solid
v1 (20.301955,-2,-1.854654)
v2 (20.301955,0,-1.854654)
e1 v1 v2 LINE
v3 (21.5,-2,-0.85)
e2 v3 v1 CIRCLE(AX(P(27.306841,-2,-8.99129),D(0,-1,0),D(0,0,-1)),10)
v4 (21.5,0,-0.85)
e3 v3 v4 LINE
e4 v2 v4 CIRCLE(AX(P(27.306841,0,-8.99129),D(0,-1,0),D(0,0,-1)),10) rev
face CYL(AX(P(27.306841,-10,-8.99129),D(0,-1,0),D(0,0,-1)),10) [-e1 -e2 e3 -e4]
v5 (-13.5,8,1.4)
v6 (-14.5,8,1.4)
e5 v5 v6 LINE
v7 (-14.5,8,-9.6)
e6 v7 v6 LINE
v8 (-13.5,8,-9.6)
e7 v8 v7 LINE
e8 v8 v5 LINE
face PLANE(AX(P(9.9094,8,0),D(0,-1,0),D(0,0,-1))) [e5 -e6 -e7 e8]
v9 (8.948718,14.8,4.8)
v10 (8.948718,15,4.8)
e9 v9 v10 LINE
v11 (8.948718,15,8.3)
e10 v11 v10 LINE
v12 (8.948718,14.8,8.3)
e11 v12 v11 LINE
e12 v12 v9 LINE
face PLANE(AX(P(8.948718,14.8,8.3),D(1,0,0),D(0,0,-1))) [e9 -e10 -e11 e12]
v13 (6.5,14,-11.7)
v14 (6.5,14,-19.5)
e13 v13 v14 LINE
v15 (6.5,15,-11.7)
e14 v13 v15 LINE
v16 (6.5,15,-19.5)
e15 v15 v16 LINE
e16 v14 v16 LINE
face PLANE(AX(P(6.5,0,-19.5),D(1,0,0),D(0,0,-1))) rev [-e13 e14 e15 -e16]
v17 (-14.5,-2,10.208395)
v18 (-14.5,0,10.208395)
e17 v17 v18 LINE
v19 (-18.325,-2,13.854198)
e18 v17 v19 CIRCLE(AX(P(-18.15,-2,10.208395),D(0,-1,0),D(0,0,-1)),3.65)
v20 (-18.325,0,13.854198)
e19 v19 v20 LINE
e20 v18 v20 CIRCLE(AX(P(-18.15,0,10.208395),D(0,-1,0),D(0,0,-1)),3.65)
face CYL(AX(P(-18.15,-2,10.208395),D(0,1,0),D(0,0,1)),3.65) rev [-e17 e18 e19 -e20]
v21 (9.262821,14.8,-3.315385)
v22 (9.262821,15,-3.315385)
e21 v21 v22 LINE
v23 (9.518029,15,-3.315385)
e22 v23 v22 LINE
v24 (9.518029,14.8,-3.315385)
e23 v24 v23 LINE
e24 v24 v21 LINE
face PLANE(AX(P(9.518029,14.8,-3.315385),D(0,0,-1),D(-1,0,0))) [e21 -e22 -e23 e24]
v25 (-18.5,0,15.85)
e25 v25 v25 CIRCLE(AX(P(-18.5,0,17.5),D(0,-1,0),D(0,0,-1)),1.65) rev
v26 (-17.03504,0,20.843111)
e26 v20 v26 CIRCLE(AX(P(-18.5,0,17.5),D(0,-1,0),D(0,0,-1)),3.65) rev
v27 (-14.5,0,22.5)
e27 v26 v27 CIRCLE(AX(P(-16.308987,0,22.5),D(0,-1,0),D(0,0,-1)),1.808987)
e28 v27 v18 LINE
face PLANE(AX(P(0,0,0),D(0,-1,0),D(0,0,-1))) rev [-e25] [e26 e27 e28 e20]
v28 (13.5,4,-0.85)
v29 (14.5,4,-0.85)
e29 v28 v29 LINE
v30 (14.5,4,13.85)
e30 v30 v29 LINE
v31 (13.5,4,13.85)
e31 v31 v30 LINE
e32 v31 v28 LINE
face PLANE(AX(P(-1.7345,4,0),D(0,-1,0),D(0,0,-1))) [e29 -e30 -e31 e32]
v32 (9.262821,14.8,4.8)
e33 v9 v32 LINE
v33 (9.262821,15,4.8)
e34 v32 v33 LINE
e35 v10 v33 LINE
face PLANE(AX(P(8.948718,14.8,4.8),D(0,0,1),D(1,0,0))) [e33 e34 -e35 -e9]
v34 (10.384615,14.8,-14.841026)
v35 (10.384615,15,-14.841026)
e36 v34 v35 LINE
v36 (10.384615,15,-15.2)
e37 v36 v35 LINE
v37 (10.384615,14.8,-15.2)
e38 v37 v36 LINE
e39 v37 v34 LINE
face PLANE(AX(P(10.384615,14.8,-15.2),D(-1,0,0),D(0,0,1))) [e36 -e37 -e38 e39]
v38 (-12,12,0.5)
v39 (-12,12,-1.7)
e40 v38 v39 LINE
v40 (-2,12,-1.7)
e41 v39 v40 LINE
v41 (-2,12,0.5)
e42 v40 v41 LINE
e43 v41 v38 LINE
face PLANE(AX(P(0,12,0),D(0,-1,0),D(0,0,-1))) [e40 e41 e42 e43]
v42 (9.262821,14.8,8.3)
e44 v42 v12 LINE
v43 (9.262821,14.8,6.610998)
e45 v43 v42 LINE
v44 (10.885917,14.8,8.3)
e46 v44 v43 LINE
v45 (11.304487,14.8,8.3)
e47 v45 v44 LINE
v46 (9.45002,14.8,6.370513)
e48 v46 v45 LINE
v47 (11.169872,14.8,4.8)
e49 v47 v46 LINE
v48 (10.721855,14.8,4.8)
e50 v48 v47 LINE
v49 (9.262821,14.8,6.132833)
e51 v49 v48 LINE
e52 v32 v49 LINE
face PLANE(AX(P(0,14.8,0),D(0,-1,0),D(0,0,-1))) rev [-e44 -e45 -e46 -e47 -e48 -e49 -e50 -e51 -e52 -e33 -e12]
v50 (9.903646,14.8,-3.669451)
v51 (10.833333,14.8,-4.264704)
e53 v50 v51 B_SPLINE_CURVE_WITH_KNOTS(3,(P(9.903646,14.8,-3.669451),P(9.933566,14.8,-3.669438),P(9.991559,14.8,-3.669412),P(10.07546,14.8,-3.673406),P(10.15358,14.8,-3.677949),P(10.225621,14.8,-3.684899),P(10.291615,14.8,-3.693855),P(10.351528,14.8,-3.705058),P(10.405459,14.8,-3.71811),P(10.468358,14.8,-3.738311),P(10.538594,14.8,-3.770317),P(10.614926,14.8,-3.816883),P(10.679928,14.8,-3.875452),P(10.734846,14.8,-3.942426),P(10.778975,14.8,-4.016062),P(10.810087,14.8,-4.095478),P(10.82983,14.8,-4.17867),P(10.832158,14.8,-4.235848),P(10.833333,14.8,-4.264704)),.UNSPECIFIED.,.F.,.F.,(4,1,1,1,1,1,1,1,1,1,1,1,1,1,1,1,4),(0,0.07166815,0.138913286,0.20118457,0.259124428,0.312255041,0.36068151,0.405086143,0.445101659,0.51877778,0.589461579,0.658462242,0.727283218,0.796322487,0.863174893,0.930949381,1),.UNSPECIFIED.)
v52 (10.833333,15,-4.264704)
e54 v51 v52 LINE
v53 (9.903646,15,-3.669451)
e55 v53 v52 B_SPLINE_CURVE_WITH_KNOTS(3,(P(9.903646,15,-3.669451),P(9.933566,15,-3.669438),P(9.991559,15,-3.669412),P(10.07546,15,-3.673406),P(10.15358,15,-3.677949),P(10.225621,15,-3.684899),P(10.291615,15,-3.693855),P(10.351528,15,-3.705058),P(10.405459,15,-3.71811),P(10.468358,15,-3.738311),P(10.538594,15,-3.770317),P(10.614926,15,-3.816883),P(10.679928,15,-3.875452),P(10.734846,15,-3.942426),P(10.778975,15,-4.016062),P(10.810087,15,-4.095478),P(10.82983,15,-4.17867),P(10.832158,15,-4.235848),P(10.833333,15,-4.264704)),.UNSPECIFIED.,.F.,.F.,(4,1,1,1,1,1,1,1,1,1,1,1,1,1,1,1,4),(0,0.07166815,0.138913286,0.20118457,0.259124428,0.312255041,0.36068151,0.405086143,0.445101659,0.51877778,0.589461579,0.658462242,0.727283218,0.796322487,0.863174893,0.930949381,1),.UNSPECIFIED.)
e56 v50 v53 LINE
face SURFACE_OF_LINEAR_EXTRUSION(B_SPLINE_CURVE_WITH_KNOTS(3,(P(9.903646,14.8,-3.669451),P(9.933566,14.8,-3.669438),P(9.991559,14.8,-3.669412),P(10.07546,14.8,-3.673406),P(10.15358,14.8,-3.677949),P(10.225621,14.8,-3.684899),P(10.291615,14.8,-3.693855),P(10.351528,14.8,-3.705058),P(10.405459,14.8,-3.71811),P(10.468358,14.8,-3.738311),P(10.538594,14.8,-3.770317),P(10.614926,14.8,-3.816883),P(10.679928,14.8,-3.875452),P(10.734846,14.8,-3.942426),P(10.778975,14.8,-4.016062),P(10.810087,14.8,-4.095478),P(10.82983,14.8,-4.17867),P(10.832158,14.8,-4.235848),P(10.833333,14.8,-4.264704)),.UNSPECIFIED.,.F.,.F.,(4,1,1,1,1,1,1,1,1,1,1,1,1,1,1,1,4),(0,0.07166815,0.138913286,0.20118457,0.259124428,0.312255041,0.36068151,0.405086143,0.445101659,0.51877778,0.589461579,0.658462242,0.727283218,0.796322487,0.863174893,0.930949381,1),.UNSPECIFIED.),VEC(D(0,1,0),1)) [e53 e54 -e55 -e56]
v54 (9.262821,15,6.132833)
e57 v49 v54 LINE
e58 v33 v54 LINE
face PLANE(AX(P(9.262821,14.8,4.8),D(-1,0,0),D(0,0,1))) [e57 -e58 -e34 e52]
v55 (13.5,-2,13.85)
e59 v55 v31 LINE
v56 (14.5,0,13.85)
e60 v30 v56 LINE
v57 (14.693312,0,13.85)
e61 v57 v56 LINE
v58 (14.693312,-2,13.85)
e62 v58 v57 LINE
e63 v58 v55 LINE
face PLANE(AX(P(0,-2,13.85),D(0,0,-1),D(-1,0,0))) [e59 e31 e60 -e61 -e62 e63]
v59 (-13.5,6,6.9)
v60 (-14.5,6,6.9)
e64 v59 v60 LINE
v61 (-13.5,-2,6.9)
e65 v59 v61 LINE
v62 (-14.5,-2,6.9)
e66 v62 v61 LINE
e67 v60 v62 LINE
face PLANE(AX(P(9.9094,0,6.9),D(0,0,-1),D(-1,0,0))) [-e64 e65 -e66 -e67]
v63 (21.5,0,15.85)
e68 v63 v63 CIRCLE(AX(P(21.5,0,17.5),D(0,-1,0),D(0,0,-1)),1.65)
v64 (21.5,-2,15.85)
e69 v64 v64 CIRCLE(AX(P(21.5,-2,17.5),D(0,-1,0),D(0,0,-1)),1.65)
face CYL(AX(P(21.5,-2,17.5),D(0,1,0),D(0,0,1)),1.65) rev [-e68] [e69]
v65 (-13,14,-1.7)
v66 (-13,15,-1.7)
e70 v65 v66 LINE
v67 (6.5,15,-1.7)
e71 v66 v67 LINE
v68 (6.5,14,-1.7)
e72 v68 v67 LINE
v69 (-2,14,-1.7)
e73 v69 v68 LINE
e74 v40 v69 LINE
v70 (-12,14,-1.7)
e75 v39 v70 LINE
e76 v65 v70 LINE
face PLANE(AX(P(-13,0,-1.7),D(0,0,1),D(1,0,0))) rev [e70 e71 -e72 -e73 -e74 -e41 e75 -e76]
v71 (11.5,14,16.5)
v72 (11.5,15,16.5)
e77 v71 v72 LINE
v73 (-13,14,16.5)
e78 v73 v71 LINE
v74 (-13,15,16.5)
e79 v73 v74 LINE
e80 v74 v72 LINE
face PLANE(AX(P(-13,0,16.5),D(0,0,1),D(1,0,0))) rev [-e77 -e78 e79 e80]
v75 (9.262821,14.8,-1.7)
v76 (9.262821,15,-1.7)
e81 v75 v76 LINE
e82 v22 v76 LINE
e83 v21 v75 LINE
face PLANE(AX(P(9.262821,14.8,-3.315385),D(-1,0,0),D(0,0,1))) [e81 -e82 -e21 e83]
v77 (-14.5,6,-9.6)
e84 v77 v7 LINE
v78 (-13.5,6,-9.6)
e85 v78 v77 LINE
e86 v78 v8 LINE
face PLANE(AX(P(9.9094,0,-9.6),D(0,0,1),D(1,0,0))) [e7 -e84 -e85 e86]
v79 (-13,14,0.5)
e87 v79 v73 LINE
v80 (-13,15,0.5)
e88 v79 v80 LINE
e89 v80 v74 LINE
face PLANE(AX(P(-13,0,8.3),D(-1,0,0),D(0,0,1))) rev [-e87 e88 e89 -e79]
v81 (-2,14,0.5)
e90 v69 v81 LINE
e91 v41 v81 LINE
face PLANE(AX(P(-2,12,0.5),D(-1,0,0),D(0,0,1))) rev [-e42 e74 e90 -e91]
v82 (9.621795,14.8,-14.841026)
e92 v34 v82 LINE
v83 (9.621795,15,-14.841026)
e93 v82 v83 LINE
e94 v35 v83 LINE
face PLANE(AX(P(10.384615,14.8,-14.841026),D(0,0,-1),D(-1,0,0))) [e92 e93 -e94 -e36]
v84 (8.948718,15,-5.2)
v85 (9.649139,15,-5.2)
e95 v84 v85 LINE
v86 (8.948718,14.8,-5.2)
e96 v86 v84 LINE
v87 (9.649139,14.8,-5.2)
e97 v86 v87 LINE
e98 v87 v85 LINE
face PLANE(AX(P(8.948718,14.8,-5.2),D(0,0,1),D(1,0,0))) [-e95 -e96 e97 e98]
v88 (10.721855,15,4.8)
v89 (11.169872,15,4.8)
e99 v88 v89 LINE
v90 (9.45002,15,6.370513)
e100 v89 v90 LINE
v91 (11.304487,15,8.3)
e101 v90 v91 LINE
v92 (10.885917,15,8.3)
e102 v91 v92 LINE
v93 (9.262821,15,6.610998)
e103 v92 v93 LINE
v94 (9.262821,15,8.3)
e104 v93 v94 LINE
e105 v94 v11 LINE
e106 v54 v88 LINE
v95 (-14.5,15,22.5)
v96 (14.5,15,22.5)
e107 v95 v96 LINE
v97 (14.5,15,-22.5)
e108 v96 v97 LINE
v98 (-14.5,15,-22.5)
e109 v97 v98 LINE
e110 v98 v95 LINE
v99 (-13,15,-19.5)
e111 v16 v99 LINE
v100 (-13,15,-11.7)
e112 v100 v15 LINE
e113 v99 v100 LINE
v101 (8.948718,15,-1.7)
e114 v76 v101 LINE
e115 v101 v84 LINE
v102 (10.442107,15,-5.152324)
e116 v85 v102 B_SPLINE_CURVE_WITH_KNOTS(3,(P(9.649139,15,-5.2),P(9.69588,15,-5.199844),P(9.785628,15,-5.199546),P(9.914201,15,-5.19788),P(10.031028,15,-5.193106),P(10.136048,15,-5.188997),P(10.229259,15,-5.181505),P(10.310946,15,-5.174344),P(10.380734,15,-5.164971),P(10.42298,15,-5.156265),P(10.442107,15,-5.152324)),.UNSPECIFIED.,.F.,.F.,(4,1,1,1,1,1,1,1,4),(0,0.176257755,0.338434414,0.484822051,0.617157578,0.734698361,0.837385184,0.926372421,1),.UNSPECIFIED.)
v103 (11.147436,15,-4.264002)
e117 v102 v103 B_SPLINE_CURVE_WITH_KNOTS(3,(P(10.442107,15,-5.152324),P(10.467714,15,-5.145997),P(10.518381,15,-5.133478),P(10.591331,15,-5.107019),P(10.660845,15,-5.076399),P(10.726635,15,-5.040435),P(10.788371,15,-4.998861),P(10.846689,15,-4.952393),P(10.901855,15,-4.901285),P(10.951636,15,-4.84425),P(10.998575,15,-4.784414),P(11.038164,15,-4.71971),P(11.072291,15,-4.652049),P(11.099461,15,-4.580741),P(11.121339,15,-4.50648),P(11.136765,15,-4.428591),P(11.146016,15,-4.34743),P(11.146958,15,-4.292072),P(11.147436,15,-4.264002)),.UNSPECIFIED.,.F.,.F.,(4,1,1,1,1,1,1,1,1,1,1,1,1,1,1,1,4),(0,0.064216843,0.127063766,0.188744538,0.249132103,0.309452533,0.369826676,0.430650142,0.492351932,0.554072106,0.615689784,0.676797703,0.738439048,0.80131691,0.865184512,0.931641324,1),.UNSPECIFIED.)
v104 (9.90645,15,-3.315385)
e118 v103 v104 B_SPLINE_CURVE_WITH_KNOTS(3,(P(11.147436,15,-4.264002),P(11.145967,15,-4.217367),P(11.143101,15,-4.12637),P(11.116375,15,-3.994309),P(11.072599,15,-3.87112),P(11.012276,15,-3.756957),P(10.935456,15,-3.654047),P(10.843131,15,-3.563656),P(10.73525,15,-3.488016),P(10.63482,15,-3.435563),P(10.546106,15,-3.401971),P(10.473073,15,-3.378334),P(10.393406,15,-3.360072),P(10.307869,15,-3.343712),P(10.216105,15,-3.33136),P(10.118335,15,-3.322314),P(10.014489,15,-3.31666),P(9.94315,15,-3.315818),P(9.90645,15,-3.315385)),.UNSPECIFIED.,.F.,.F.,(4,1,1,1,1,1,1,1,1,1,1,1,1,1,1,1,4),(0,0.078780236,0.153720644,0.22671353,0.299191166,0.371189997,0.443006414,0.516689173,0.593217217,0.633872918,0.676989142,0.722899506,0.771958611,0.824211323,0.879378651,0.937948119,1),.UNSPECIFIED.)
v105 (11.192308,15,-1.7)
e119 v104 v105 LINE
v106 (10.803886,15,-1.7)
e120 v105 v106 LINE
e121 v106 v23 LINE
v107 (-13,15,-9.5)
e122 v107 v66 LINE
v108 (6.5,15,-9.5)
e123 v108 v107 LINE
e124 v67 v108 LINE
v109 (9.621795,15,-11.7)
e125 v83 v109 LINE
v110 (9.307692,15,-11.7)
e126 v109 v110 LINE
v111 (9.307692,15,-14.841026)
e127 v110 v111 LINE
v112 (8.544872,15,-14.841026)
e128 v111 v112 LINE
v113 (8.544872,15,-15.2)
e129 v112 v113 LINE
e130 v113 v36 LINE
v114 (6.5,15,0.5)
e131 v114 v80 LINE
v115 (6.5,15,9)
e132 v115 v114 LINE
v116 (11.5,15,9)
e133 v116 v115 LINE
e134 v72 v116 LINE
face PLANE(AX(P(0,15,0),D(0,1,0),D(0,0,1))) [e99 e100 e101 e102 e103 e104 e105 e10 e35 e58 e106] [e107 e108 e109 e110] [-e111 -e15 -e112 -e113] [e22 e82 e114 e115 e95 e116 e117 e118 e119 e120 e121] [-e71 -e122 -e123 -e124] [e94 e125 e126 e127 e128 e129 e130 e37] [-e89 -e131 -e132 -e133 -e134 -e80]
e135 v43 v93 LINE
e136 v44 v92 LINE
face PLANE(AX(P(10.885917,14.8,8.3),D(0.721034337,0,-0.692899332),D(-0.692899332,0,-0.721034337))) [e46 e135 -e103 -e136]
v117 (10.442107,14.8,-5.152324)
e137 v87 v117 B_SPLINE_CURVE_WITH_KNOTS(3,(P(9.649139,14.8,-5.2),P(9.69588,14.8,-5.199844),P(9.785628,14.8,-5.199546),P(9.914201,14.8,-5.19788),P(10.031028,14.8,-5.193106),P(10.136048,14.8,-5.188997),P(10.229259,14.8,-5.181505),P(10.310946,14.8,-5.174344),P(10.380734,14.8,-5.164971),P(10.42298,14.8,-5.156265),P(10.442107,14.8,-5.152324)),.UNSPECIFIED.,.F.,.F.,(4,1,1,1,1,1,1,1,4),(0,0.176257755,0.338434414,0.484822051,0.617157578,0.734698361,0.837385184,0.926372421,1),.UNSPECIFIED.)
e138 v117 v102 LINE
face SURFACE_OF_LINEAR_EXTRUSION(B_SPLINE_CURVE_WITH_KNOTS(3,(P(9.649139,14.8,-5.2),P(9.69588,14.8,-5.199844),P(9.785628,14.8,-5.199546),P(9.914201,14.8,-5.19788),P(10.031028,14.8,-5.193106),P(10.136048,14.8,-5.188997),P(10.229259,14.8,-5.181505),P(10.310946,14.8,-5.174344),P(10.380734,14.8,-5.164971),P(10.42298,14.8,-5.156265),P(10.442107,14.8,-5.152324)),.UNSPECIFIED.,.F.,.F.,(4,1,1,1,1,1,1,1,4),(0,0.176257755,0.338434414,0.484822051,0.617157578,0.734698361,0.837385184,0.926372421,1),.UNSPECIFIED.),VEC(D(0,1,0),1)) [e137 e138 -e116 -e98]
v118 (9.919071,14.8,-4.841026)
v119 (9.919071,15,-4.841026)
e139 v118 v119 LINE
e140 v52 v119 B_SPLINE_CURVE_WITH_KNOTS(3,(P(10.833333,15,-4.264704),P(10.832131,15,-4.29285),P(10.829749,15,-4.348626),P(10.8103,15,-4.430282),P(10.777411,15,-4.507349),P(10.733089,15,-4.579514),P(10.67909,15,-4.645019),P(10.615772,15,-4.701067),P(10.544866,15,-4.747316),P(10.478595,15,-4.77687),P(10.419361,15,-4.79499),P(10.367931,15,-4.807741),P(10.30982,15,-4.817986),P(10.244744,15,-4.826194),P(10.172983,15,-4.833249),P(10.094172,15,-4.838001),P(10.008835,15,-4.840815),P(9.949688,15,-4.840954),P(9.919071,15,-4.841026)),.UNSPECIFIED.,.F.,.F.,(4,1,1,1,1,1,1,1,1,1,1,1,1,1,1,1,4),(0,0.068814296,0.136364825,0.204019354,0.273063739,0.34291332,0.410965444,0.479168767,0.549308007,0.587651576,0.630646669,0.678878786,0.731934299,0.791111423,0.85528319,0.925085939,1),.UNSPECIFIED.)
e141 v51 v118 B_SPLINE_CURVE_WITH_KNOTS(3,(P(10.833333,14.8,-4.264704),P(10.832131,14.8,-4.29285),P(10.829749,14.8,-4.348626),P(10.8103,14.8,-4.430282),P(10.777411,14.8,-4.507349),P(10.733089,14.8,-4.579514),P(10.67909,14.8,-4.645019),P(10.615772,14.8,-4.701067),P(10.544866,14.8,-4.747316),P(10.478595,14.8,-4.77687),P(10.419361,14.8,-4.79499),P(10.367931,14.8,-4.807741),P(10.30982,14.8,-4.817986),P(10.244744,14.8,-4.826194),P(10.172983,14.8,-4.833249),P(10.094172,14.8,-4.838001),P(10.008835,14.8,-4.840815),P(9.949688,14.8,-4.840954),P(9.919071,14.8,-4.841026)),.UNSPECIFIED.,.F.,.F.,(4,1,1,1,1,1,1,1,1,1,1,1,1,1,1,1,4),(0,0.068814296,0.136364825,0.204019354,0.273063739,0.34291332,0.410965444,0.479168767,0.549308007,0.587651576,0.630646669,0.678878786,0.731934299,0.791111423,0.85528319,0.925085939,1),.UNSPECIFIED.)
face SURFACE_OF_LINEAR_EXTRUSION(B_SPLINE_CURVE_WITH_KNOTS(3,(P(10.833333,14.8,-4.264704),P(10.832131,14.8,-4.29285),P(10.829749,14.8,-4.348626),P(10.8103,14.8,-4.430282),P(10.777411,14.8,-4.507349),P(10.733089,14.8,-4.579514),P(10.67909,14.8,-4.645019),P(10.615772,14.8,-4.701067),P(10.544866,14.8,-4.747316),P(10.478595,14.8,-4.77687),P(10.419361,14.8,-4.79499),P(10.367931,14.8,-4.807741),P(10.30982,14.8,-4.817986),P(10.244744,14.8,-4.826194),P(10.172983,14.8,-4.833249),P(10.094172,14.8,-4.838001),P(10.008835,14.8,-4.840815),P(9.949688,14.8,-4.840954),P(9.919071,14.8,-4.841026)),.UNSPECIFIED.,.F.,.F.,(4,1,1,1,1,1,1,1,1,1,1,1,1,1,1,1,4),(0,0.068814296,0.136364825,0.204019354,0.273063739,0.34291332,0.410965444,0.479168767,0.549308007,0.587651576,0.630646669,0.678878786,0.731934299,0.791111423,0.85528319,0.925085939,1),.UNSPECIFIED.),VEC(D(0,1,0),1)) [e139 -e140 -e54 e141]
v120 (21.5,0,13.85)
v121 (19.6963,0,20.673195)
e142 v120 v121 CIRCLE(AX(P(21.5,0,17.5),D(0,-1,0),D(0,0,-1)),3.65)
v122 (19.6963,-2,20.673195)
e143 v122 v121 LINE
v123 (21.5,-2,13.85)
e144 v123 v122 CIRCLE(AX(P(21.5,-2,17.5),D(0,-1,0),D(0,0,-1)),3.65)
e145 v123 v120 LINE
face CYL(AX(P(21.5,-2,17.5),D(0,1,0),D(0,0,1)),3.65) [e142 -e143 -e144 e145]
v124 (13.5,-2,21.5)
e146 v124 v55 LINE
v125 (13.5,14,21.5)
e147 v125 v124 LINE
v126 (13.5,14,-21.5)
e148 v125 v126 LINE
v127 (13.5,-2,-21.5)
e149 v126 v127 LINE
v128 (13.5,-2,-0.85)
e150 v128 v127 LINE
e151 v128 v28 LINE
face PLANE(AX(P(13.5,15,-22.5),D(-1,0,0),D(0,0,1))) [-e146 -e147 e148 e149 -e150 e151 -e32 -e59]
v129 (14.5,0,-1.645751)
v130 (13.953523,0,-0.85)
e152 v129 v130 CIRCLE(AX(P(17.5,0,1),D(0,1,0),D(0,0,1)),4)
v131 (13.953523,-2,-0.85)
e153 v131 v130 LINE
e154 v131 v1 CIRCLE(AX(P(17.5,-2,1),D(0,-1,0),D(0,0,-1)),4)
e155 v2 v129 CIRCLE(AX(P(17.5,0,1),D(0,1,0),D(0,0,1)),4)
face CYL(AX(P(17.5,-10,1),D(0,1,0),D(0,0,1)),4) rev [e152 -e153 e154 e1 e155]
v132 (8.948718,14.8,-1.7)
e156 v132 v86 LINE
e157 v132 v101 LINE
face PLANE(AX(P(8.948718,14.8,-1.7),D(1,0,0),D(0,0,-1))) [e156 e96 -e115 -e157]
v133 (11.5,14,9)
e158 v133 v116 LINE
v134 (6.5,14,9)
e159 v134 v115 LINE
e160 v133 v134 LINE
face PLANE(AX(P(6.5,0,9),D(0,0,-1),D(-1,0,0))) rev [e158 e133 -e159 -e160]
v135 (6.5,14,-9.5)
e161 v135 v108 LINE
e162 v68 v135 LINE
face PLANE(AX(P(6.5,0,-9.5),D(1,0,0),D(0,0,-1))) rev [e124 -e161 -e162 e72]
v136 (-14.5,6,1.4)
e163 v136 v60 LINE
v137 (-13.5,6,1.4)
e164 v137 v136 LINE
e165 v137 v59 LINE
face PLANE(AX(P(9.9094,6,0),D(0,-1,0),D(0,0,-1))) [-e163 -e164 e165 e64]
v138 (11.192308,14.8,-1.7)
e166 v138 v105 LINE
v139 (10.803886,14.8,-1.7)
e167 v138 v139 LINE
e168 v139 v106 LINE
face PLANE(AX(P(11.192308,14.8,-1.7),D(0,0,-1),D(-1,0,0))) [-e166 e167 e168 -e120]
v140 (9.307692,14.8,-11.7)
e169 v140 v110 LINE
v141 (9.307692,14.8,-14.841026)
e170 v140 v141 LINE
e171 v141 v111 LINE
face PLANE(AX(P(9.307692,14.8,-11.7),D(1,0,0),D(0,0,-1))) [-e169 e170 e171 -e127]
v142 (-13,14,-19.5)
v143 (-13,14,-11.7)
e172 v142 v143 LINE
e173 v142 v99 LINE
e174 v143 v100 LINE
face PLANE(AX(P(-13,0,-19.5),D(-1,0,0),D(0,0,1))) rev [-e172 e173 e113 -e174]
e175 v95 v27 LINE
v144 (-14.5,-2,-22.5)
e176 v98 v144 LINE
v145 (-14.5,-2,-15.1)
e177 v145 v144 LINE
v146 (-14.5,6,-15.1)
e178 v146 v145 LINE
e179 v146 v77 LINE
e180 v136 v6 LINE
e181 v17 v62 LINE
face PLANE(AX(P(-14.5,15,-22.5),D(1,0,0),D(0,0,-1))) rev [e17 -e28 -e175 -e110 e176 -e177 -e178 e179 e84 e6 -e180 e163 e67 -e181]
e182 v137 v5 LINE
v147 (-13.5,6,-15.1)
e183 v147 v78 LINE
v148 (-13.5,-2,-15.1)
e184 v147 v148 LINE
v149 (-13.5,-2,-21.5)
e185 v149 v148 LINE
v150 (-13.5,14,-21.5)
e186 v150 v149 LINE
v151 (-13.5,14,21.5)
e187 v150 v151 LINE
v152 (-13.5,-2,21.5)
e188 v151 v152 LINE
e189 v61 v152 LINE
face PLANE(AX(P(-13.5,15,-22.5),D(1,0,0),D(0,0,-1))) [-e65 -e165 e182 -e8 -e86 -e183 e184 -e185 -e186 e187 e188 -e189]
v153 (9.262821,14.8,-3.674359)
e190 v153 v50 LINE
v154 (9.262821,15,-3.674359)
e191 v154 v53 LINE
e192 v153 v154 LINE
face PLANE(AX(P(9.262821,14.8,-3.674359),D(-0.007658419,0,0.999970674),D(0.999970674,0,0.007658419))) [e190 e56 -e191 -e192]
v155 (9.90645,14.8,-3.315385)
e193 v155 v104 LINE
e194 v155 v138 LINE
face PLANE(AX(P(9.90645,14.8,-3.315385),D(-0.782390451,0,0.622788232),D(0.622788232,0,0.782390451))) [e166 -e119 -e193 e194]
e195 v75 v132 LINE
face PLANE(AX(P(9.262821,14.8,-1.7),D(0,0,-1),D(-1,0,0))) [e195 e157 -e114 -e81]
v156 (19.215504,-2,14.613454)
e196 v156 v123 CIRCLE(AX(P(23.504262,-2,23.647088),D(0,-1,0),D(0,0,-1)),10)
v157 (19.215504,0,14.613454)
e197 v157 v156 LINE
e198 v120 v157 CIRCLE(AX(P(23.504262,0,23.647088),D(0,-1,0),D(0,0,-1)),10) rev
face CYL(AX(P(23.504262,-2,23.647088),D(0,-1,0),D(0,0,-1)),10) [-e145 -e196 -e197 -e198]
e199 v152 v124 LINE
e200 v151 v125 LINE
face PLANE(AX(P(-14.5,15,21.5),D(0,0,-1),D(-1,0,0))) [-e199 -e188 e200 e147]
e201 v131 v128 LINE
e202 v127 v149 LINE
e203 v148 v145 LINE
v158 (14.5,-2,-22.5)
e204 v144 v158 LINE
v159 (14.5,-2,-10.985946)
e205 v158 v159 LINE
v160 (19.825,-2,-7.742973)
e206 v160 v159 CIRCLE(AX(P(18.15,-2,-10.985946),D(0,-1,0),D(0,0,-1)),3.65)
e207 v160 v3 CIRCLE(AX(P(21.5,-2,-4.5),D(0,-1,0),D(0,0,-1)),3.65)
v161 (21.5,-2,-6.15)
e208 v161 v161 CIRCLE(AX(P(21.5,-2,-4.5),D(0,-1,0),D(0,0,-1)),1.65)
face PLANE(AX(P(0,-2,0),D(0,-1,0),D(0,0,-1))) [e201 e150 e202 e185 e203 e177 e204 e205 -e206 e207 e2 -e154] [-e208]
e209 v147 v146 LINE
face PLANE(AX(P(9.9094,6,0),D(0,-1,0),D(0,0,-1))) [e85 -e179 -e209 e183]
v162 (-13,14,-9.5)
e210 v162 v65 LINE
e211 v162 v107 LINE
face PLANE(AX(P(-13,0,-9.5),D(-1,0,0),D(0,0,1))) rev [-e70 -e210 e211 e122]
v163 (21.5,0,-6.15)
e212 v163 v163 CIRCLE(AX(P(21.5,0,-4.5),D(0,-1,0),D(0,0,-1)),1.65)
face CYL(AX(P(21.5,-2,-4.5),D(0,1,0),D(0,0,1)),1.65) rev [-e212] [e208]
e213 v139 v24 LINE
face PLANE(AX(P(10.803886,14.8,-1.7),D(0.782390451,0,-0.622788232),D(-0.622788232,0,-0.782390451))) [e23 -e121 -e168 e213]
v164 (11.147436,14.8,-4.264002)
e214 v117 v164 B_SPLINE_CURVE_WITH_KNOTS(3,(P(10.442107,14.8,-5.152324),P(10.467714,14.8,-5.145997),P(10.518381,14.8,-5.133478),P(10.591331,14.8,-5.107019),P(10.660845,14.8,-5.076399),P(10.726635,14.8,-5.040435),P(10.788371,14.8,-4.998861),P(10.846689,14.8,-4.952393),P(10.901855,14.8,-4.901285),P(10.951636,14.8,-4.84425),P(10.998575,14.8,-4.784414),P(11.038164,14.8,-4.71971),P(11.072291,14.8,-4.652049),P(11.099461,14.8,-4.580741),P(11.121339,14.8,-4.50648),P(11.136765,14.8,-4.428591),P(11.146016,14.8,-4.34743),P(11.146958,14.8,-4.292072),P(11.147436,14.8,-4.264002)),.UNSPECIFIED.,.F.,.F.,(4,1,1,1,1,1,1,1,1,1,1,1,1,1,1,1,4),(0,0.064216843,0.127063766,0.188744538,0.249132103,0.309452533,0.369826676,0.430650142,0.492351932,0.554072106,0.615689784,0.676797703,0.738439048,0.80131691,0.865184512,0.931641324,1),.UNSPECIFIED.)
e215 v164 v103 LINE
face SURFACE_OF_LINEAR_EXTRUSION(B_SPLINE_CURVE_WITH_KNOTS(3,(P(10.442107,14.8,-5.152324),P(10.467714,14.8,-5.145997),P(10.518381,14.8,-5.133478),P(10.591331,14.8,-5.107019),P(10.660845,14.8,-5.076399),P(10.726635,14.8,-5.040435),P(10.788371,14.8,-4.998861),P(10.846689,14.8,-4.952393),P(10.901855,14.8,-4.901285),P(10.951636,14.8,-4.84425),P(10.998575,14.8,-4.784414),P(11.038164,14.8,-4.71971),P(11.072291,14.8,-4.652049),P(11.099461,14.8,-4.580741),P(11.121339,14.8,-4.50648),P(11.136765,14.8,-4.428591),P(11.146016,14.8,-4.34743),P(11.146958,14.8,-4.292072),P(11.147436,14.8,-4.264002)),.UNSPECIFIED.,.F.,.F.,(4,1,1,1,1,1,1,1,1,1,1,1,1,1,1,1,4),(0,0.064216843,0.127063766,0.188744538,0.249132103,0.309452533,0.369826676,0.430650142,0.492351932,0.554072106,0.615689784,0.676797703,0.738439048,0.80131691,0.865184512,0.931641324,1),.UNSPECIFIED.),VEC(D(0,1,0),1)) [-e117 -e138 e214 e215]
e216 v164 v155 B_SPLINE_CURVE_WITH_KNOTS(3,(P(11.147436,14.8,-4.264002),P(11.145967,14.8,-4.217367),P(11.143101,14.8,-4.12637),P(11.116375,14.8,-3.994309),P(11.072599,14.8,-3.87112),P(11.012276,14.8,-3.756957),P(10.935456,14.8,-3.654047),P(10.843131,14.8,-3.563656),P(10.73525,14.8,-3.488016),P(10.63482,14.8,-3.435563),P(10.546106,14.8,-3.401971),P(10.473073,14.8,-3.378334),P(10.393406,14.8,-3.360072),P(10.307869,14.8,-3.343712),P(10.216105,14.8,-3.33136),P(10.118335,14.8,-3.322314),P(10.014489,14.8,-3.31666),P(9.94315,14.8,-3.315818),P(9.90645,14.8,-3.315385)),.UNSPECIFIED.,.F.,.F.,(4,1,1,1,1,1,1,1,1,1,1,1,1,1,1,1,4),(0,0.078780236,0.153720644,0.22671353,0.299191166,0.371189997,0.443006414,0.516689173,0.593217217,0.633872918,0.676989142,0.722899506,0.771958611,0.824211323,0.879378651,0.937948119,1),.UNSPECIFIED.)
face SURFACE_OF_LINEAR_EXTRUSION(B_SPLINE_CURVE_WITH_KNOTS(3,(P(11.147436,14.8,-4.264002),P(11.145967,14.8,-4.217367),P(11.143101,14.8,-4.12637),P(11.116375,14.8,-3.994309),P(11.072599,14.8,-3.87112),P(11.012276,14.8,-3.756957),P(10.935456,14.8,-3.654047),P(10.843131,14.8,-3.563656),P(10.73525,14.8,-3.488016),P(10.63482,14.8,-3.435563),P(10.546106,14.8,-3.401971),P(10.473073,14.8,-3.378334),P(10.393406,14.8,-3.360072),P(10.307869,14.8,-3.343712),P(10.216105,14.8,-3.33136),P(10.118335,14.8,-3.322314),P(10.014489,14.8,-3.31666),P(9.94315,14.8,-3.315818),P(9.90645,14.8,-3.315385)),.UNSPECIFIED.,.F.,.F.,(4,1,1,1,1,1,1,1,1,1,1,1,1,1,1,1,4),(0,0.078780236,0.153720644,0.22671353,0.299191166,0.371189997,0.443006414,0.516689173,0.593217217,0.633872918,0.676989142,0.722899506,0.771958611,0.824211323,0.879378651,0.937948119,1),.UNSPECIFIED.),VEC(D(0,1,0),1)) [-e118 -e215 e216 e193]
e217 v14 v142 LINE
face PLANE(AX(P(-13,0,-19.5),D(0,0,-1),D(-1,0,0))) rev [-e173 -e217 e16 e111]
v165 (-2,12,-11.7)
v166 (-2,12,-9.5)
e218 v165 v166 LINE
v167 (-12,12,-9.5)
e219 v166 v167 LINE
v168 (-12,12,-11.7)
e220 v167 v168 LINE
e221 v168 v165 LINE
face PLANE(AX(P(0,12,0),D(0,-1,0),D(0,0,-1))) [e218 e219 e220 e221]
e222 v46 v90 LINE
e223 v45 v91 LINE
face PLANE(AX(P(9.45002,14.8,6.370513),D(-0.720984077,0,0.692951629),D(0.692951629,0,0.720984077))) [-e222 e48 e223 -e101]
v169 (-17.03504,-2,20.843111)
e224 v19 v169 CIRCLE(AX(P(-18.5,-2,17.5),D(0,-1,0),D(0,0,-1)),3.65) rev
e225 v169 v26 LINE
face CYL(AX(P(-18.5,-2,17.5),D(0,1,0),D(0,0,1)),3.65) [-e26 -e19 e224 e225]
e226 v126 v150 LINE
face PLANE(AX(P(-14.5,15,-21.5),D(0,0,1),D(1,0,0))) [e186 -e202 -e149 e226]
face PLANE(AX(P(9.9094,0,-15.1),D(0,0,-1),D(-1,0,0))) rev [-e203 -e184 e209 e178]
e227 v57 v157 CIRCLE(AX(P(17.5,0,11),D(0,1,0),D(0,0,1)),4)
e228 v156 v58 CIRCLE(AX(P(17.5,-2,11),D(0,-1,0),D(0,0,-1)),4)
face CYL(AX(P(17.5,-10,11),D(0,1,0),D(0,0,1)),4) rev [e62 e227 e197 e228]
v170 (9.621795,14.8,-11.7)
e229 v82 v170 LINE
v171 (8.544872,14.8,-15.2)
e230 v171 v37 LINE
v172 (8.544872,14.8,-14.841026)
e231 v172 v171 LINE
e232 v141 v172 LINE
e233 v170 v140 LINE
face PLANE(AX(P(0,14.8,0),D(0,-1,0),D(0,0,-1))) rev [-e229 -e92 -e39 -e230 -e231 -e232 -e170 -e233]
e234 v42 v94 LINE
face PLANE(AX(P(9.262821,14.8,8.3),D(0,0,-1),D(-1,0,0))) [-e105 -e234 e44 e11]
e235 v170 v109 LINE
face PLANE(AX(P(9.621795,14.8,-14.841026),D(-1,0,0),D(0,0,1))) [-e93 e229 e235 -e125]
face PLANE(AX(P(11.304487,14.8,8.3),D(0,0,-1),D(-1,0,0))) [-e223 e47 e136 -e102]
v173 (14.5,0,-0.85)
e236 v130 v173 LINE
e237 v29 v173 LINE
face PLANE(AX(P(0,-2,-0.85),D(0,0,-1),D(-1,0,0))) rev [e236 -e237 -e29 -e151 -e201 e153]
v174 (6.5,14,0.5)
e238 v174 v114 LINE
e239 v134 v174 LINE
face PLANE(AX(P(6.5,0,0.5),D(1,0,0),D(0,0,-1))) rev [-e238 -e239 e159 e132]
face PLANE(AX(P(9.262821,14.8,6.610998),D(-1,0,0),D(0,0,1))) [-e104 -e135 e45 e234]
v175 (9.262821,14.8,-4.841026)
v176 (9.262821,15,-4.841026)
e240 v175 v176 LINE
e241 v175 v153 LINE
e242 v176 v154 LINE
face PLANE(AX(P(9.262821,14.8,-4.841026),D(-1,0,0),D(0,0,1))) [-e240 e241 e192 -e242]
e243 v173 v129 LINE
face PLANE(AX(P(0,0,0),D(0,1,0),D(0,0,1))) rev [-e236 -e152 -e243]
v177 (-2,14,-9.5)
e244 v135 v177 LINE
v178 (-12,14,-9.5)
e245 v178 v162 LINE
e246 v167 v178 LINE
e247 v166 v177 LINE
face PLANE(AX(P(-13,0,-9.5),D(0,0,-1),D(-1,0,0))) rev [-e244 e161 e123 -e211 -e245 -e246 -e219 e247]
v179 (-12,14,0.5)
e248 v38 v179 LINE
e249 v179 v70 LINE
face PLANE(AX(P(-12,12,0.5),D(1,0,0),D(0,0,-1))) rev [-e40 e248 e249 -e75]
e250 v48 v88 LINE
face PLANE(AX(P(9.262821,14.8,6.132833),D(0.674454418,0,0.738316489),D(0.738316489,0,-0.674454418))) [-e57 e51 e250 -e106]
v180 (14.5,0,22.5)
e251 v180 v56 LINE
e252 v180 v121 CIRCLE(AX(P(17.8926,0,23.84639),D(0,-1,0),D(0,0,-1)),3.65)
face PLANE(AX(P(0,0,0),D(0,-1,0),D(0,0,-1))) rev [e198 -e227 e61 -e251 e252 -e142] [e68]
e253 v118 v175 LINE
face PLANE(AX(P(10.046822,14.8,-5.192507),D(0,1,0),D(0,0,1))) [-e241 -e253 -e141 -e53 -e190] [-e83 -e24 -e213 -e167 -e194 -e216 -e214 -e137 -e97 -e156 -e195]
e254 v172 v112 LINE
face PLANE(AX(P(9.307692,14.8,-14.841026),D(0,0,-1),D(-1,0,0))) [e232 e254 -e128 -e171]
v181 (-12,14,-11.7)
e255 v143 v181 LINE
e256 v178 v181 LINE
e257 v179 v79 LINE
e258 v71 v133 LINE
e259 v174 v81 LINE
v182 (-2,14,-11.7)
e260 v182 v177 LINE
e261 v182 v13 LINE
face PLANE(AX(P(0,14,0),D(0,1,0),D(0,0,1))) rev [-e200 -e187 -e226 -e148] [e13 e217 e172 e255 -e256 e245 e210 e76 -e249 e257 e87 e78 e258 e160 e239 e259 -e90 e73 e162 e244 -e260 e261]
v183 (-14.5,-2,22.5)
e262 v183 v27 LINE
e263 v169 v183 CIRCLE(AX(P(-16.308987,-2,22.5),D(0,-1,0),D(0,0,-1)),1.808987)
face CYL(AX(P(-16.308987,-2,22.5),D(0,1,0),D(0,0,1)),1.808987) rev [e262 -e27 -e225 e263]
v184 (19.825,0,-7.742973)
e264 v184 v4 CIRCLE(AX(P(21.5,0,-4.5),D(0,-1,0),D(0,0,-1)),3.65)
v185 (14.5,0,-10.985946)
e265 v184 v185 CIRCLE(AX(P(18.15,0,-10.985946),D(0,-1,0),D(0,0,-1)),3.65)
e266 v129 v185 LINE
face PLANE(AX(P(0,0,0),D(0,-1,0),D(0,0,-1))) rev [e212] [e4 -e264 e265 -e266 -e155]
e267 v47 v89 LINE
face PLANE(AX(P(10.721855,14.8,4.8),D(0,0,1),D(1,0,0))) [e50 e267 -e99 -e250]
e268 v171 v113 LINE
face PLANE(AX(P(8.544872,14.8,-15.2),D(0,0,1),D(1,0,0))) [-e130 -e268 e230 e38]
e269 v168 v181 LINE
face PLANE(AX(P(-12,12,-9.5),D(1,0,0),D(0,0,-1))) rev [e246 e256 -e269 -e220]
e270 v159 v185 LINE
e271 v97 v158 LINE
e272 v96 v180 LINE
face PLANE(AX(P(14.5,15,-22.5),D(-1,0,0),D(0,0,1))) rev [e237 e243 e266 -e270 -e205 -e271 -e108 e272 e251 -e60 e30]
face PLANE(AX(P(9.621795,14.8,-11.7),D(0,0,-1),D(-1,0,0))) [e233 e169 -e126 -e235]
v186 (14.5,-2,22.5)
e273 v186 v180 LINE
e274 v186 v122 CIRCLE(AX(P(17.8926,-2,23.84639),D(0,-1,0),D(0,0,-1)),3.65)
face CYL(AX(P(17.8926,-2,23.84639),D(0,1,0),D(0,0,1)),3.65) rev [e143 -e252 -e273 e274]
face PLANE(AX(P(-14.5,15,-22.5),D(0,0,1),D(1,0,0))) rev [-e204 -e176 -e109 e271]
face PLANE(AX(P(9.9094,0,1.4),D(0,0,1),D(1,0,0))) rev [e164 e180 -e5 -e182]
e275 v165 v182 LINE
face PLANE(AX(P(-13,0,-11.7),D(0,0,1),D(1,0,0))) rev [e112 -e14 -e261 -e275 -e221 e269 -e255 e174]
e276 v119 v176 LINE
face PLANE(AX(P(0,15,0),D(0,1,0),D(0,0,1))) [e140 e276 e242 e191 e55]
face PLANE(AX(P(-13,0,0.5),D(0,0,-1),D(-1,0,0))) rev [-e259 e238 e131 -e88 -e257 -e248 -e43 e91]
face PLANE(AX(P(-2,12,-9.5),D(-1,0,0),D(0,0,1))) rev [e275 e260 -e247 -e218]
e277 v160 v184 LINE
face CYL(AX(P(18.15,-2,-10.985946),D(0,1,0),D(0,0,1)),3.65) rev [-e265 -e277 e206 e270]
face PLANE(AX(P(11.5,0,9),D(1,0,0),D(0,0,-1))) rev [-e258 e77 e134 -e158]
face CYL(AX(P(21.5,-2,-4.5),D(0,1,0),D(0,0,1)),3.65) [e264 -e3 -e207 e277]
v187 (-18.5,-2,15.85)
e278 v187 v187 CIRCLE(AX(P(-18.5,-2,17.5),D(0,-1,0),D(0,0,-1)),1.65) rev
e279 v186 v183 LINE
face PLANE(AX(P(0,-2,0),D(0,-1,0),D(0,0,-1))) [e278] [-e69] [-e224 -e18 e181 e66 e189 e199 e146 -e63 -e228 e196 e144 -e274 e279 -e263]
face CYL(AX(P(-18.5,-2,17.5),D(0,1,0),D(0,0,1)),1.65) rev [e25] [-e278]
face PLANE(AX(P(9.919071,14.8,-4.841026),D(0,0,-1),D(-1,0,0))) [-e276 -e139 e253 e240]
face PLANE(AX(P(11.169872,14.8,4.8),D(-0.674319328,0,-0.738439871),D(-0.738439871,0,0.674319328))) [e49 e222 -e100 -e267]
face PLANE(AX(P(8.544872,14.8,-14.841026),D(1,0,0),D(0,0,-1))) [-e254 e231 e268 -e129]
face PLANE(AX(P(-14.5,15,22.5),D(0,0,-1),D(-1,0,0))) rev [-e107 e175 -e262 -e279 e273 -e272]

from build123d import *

# Parameters (mm, degrees)
SKETCH1_W           = 29
SKETCH1_H           = 45
BOSS_EXTRUDE1_DEPTH = 15
SHELL2_T            = -1
SKETCH2_W           = 19.5
SKETCH2_H           = 7.8
CUT_EXTRUDE2_DEPTH  = 31.683871985
SKETCH3_W           = 10
SKETCH3_H           = 2.2
BOSS_EXTRUDE2_DEPTH = 2
CUTOUT_W            = 11
CUTOUT_H            = 2
CUT_EXTRUDE3_DEPTH  = 1
SKETCH5_R           = 1.65
BOSS_EXTRUDE3_DEPTH = 2
CUT_EXTRUDE4_DEPTH  = 0.2
CUT_EXTRUDE5_REACH  = 47.546
SKETCH7_W           = 14.7
SKETCH7_H           = 4
CUT_EXTRUDE6_DEPTH  = 10
FILLET1_R           = 10


with BuildPart() as part:
    # Sketch1 → Boss-Extrude1 (new body)
    with BuildSketch(Plane(origin=(0, 0, 0), x_dir=(1, 0, 0), z_dir=(0, 1, 0))):
        Rectangle(SKETCH1_W, SKETCH1_H)
    extrude(amount=BOSS_EXTRUDE1_DEPTH)

    # Shell2
    shell2_openings = [part.faces().sort_by_distance(p)[0] for p in [
        (0, 0, 0),
    ]]
    offset(amount=SHELL2_T, openings=shell2_openings, kind=Kind.INTERSECTION)

    # Sketch2 → Cut-Extrude2 (cut, through all)
    with BuildSketch(Plane(origin=(0, 15, 0), x_dir=(1, 0, 0), z_dir=(0, 1, 0))):
        with Locations((-3.25, 5.6)):
            Rectangle(SKETCH2_W, SKETCH2_H)
        with Locations((-3.25, 15.6)):
            Rectangle(SKETCH2_W, SKETCH2_H)
        Polygon((-13, -0.5), (-13, -8.3), (-13, -9.7), (-13, -16.5), (11.5, -16.5), (11.5, -9), (6.5, -9), (6.5, -8.3), (6.5, -0.5), align=None)
    extrude(amount=-CUT_EXTRUDE2_DEPTH, mode=Mode.SUBTRACT)

    # Sketch3 → Boss-Extrude2 (add)
    with BuildSketch(Plane.XZ.offset(-14)):
        with Locations((-7, -0.6)):
            Rectangle(SKETCH3_W, SKETCH3_H)
        with Locations((-7, -10.6)):
            Rectangle(SKETCH3_W, SKETCH3_H)
    extrude(amount=BOSS_EXTRUDE2_DEPTH)

    # cutout → Cut-Extrude3 (cut)
    with BuildSketch(Plane.ZY.offset(14.5)):
        with Locations((-4.1, 7)):
            Rectangle(CUTOUT_W, CUTOUT_H)
        Polygon((-9.6, 6), (-15.1, 6), (-15.1, 0), (6.9, 0), (6.9, 6), (1.4, 6), align=None)
    extrude(amount=-CUT_EXTRUDE3_DEPTH, mode=Mode.SUBTRACT)

    # Sketch5 → Boss-Extrude3 (add)
    # profile 1 of 2: a face of its own
    with BuildSketch(Plane.XZ):
        with BuildLine():
            Line((-14.5, 10.208395238), (-14.5, 6.9))
            Line((-14.5, 6.9), (-13.5, 6.9))
            Line((-13.5, 6.9), (-13.5, 21.5))
            Line((-13.5, 21.5), (13.5, 21.5))
            Line((13.5, 21.5), (13.5, 13.85))
            Line((13.5, 13.85), (21.5, 13.85))
            ThreePointArc((21.5, 13.85), (25.028786021, 18.432828613), (19.696299962, 20.673194947))
            ThreePointArc((19.696299962, 20.673194947), (16.682040183, 20.402983861), (14.5, 22.5))
            Line((14.5, 22.5), (-14.5, 22.5))
            ThreePointArc((-14.5, 22.5), (-15.319286654, 20.985758581), (-17.035039959, 20.843111138))
            ThreePointArc((-17.035039959, 20.843111138), (-22.089372546, 18.162498848), (-18.325, 13.854197619))
            ThreePointArc((-18.325, 13.854197619), (-15.631692036, 12.850482481), (-14.5, 10.208395238))
        make_face()
        with Locations(Location((-18.5, 17.5, 0), (0, 0, 270))):
            Circle(SKETCH5_R, mode=Mode.SUBTRACT)
        with Locations(Location((21.5, 17.5, 0), (0, 0, 270))):
            Circle(SKETCH5_R, mode=Mode.SUBTRACT)
    # profile 2 of 2: a face of its own
    with BuildSketch(Plane.XZ):
        with BuildLine():
            Line((14.5, -22.5), (14.5, -10.985946346))
            ThreePointArc((14.5, -10.985946346), (16.25148084, -7.86855561), (19.825, -7.742973173))
            ThreePointArc((19.825, -7.742973173), (25.046783901, -5.361872357), (21.5, -0.85))
            Line((21.5, -0.85), (13.5, -0.85))
            Line((13.5, -0.85), (13.5, -21.5))
            Line((13.5, -21.5), (-13.5, -21.5))
            Line((-13.5, -21.5), (-13.5, -15.1))
            Line((-13.5, -15.1), (-14.5, -15.1))
            Line((-14.5, -15.1), (-14.5, -22.5))
            Line((-14.5, -22.5), (14.5, -22.5))
        make_face()
        with Locations(Location((21.5, -4.5, 0), (0, 0, 270))):
            Circle(SKETCH5_R, mode=Mode.SUBTRACT)
    extrude(amount=BOSS_EXTRUDE3_DEPTH)

    # Sketch6 → Cut-Extrude4 (cut)
    # profile 1 of 3: a face of its own
    with BuildSketch(Plane(origin=(0, 15, 0), x_dir=(1, 0, 0), z_dir=(0, 1, 0))):
        Polygon((8.544871795, 14.841025641), (8.544871795, 15.2), (10.384615385, 15.2), (10.384615385, 14.841025641), (9.621794872, 14.841025641), (9.621794872, 11.7), (9.307692308, 11.7), (9.307692308, 14.841025641), align=None)
    # profile 2 of 3: a face of its own
    with BuildSketch(Plane(origin=(0, 15, 0), x_dir=(1, 0, 0), z_dir=(0, 1, 0))):
        with BuildLine():
            Line((8.948717949, 5.2), (9.649138622, 5.2))
            add(Edge.make_bspline(
                [(9.649138622, 5.2), (9.69587975, 5.199844414), (9.785627895, 5.199545672), (9.914201165, 5.197879909), (10.031028262, 5.193105553), (10.136048101, 5.18899697), (10.229258756, 5.181505028), (10.310946047, 5.174344381), (10.380733745, 5.16497072), (10.422979596, 5.156265297), (10.442107372, 5.152323718)],
                knots=[0, 0, 0, 0, 1.410062039, 2.707475311, 3.878576406, 4.937260626, 5.877586885, 6.699081471, 7.410979367, 8, 8, 8, 8], degree=3))
            add(Edge.make_bspline(
                [(10.442107372, 5.152323718), (10.467713996, 5.145996953), (10.518380985, 5.133478389), (10.591331051, 5.107018788), (10.660845375, 5.076399163), (10.7266352, 5.040435443), (10.788370991, 4.998860663), (10.846689302, 4.952392541), (10.901854765, 4.901285335), (10.951636395, 4.844250494), (10.998575447, 4.784413984), (11.038164073, 4.719710227), (11.072290553, 4.6520487), (11.09946107, 4.580741282), (11.121339044, 4.50647951), (11.136765283, 4.428590713), (11.146016471, 4.347429738), (11.146958326, 4.29207183), (11.147435897, 4.264002404)],
                knots=[0, 0, 0, 0, 1.027469482, 2.033020251, 3.019912614, 3.986113645, 4.951240523, 5.91722682, 6.890402269, 7.87763091, 8.8651537, 9.85103654, 10.82876324, 11.815024772, 12.821070561, 13.842952187, 14.906261191, 16, 16, 16, 16], degree=3))
            add(Edge.make_bspline(
                [(11.147435897, 4.264002404), (11.145966899, 4.217367299), (11.143100504, 4.126370131), (11.1163754, 3.99430925), (11.07259888, 3.871119935), (11.012275591, 3.756957297), (10.935456115, 3.654046652), (10.843131324, 3.563656197), (10.735249713, 3.488016284), (10.634820397, 3.435563479), (10.546106197, 3.401970571), (10.473072884, 3.378334212), (10.393405907, 3.360072247), (10.307868572, 3.343712115), (10.216104917, 3.33136042), (10.118334877, 3.322313826), (10.014488726, 3.316659777), (9.943149656, 3.315817772), (9.906450321, 3.315384615)],
                knots=[0, 0, 0, 0, 1.260483769, 2.459530307, 3.627416485, 4.787058657, 5.939039949, 7.08810263, 8.267026773, 9.491475466, 10.141966685, 10.831826277, 11.566392101, 12.351337768, 13.187381173, 14.07005841, 15.007169909, 16, 16, 16, 16], degree=3))
            Line((9.906450321, 3.315384615), (11.192307692, 1.7))
            Line((11.192307692, 1.7), (10.803886218, 1.7))
            Line((10.803886218, 1.7), (9.518028846, 3.315384615))
            Line((9.518028846, 3.315384615), (9.262820513, 3.315384615))
            Line((9.262820513, 3.315384615), (9.262820513, 1.7))
            Line((9.262820513, 1.7), (8.948717949, 1.7))
            Line((8.948717949, 1.7), (8.948717949, 5.2))
        make_face()
        with BuildLine():
            Line((9.262820513, 4.841025641), (9.262820513, 3.674358974))
            Line((9.262820513, 3.674358974), (9.903645833, 3.669451122))
            add(Edge.make_bspline(
                [(9.903645833, 3.669451122), (9.933565872, 3.669437885), (9.991559429, 3.669412229), (10.075460094, 3.673406005), (10.153580206, 3.677949323), (10.225620958, 3.684898669), (10.291614533, 3.69385474), (10.351527947, 3.705057725), (10.405458998, 3.718109787), (10.468357537, 3.738311413), (10.538594068, 3.770317431), (10.614925528, 3.81688293), (10.679927866, 3.875452049), (10.734845728, 3.942425505), (10.77897516, 4.016061754), (10.810087214, 4.095478123), (10.829829656, 4.178669721), (10.832158202, 4.235847829), (10.833333333, 4.264703526)],
                knots=[0, 0, 0, 0, 1.146690395, 2.22261258, 3.21895312, 4.145990853, 4.996080663, 5.770904154, 6.481378293, 7.121626537, 8.300444488, 9.431385265, 10.535395872, 11.636531494, 12.74115979, 13.810798291, 14.895190096, 16, 16, 16, 16], degree=3))
            add(Edge.make_bspline(
                [(10.833333333, 4.264703526), (10.832131212, 4.292850099), (10.829749047, 4.348626338), (10.810300278, 4.430282248), (10.777410897, 4.507349198), (10.733088659, 4.579513683), (10.679089504, 4.645019419), (10.615771691, 4.701066572), (10.544866496, 4.747316037), (10.478595298, 4.776870418), (10.419361085, 4.794990271), (10.367931425, 4.807741435), (10.309819948, 4.817985904), (10.244744489, 4.826193964), (10.172982858, 4.833248909), (10.094172207, 4.838000687), (10.008835427, 4.840814551), (9.949688496, 4.84095364), (9.919070513, 4.841025641)],
                knots=[0, 0, 0, 0, 1.101028733, 2.181837193, 3.264309656, 4.369019818, 5.486613113, 6.575447106, 7.666700264, 8.788928104, 9.402425223, 10.0903467, 10.862060571, 11.710948788, 12.657782767, 13.684531032, 14.801375019, 16, 16, 16, 16], degree=3))
            Line((9.919070513, 4.841025641), (9.262820513, 4.841025641))
        make_face(mode=Mode.SUBTRACT)
    # profile 3 of 3: a face of its own
    with BuildSketch(Plane(origin=(0, 15, 0), x_dir=(1, 0, 0), z_dir=(0, 1, 0))):
        Polygon((8.948717949, -4.8), (9.262820513, -4.8), (9.262820513, -6.132832532), (10.721854968, -4.8), (11.169871795, -4.8), (9.450020032, -6.370512821), (11.304487179, -8.3), (10.885917468, -8.3), (9.262820513, -6.610997596), (9.262820513, -8.3), (8.948717949, -8.3), align=None)
    extrude(amount=-CUT_EXTRUDE4_DEPTH, mode=Mode.SUBTRACT)

    # Sketch7 → Cut-Extrude5 (cut, up to next)
    with BuildSketch(Plane(origin=(14.5, 0, 0), x_dir=(0, 0, -1), z_dir=(1, 0, 0)), mode=Mode.PRIVATE) as cut_extrude5_sk1:
        with Locations((-6.5, 2)):
            Rectangle(SKETCH7_W, SKETCH7_H)
    cut_extrude5_tool1 = extrude(cut_extrude5_sk1.sketch, amount=-CUT_EXTRUDE5_REACH, mode=Mode.PRIVATE) & part.part
    add(cut_extrude5_tool1.solids().sort_by_distance((14.5, 2, 6.5))[0], mode=Mode.SUBTRACT)

    # Sketch8 → Cut-Extrude6 (cut)
    with BuildSketch(Plane(origin=(0, 0, 0), x_dir=(1, 0, 0), z_dir=(0, 1, 0))):
        with BuildLine():
            ThreePointArc((14.69331156, -13.85), (17.5, -15), (20.30668844, -13.85))
            Line((20.30668844, -13.85), (14.69331156, -13.85))
        make_face()
        with BuildLine():
            Line((14.69331156, -13.85), (20.30668844, -13.85))
            ThreePointArc((20.30668844, -13.85), (21.189630995, -12.544869936), (21.5, -11))
            ThreePointArc((21.5, -11), (15.955130064, -7.310369005), (14.69331156, -13.85))
        make_face()
        with BuildLine():
            ThreePointArc((21.046477125, 0.85), (17.982663806, 2.970772677), (14.5, 1.645751311))
            Line((14.5, 1.645751311), (14.5, 0.85))
            Line((14.5, 0.85), (21.046477125, 0.85))
        make_face()
        with BuildLine():
            Line((14.5, 0.85), (14.5, 1.645751311))
            ThreePointArc((14.5, 1.645751311), (16.085786438, -4.741657387), (21.5, -1))
            ThreePointArc((21.5, -1), (21.384965154, -0.047610505), (21.046477125, 0.85))
            Line((21.046477125, 0.85), (14.5, 0.85))
        make_face()
    extrude(amount=-CUT_EXTRUDE6_DEPTH, mode=Mode.SUBTRACT)

    # Fillet1
    # the kernel refuses this fillet: 10 mm, written as the material it takes off along each edge
    with BuildSketch(Plane(origin=(21.046477125, -5.126143642, -0.85), x_dir=(-0.5954001389119016, 0, -0.8034293214612523), z_dir=(0, 1, 0))) as fillet1_piece_1:
        with BuildLine():
            CenterArc((2.813529277, -9.877084918), FILLET1_R, 98.992616394, 8.967548011)
            Line((-0.270027583, -0.364373576), (-0.33169872, -0.174119349))
            ThreePointArc((-0.33169872, -0.174119349), (-0.295699656, -0.06310676), (-0.160685864, 0.119080028))
            Line((-0.160685864, 0.119080028), (0.031261436, 0.197541698))
            ThreePointArc((0.031261436, 0.197541698), (0.625228728, 0.150833967), (1.21919602, 0.197541698))
            Line((1.21919602, 0.197541698), (1.250457457, 0))
        make_face()
    extrude(amount=8.252287283, mode=Mode.SUBTRACT)
    with BuildSketch(Plane(origin=(20.30668844, -5.329363755, 13.85), x_dir=(-0.8193644478649244, 0, 0.5732729730023975), z_dir=(0, 1, 0))) as fillet1_piece_2:
        with BuildLine():
            CenterArc((2.99642738, 9.860468257), FILLET1_R, 246.583108126, 13.834356768)
            Line((-0.977757067, 0.684093266), (-1.057240756, 0.500565766))
            ThreePointArc((-1.057240756, 0.500565766), (-0.603533128, 0.178173743), (-0.114654595, -0.16387289))
            Line((-0.114654595, -0.16387289), (0.033293638, -0.197209365))
            ThreePointArc((0.033293638, -0.197209365), (0.665872751, -0.144187303), (1.298451864, -0.197209365))
            Line((1.298451864, -0.197209365), (1.331745502, 0))
        make_face()
    extrude(amount=8.65872751, mode=Mode.SUBTRACT)


solid = part.part
